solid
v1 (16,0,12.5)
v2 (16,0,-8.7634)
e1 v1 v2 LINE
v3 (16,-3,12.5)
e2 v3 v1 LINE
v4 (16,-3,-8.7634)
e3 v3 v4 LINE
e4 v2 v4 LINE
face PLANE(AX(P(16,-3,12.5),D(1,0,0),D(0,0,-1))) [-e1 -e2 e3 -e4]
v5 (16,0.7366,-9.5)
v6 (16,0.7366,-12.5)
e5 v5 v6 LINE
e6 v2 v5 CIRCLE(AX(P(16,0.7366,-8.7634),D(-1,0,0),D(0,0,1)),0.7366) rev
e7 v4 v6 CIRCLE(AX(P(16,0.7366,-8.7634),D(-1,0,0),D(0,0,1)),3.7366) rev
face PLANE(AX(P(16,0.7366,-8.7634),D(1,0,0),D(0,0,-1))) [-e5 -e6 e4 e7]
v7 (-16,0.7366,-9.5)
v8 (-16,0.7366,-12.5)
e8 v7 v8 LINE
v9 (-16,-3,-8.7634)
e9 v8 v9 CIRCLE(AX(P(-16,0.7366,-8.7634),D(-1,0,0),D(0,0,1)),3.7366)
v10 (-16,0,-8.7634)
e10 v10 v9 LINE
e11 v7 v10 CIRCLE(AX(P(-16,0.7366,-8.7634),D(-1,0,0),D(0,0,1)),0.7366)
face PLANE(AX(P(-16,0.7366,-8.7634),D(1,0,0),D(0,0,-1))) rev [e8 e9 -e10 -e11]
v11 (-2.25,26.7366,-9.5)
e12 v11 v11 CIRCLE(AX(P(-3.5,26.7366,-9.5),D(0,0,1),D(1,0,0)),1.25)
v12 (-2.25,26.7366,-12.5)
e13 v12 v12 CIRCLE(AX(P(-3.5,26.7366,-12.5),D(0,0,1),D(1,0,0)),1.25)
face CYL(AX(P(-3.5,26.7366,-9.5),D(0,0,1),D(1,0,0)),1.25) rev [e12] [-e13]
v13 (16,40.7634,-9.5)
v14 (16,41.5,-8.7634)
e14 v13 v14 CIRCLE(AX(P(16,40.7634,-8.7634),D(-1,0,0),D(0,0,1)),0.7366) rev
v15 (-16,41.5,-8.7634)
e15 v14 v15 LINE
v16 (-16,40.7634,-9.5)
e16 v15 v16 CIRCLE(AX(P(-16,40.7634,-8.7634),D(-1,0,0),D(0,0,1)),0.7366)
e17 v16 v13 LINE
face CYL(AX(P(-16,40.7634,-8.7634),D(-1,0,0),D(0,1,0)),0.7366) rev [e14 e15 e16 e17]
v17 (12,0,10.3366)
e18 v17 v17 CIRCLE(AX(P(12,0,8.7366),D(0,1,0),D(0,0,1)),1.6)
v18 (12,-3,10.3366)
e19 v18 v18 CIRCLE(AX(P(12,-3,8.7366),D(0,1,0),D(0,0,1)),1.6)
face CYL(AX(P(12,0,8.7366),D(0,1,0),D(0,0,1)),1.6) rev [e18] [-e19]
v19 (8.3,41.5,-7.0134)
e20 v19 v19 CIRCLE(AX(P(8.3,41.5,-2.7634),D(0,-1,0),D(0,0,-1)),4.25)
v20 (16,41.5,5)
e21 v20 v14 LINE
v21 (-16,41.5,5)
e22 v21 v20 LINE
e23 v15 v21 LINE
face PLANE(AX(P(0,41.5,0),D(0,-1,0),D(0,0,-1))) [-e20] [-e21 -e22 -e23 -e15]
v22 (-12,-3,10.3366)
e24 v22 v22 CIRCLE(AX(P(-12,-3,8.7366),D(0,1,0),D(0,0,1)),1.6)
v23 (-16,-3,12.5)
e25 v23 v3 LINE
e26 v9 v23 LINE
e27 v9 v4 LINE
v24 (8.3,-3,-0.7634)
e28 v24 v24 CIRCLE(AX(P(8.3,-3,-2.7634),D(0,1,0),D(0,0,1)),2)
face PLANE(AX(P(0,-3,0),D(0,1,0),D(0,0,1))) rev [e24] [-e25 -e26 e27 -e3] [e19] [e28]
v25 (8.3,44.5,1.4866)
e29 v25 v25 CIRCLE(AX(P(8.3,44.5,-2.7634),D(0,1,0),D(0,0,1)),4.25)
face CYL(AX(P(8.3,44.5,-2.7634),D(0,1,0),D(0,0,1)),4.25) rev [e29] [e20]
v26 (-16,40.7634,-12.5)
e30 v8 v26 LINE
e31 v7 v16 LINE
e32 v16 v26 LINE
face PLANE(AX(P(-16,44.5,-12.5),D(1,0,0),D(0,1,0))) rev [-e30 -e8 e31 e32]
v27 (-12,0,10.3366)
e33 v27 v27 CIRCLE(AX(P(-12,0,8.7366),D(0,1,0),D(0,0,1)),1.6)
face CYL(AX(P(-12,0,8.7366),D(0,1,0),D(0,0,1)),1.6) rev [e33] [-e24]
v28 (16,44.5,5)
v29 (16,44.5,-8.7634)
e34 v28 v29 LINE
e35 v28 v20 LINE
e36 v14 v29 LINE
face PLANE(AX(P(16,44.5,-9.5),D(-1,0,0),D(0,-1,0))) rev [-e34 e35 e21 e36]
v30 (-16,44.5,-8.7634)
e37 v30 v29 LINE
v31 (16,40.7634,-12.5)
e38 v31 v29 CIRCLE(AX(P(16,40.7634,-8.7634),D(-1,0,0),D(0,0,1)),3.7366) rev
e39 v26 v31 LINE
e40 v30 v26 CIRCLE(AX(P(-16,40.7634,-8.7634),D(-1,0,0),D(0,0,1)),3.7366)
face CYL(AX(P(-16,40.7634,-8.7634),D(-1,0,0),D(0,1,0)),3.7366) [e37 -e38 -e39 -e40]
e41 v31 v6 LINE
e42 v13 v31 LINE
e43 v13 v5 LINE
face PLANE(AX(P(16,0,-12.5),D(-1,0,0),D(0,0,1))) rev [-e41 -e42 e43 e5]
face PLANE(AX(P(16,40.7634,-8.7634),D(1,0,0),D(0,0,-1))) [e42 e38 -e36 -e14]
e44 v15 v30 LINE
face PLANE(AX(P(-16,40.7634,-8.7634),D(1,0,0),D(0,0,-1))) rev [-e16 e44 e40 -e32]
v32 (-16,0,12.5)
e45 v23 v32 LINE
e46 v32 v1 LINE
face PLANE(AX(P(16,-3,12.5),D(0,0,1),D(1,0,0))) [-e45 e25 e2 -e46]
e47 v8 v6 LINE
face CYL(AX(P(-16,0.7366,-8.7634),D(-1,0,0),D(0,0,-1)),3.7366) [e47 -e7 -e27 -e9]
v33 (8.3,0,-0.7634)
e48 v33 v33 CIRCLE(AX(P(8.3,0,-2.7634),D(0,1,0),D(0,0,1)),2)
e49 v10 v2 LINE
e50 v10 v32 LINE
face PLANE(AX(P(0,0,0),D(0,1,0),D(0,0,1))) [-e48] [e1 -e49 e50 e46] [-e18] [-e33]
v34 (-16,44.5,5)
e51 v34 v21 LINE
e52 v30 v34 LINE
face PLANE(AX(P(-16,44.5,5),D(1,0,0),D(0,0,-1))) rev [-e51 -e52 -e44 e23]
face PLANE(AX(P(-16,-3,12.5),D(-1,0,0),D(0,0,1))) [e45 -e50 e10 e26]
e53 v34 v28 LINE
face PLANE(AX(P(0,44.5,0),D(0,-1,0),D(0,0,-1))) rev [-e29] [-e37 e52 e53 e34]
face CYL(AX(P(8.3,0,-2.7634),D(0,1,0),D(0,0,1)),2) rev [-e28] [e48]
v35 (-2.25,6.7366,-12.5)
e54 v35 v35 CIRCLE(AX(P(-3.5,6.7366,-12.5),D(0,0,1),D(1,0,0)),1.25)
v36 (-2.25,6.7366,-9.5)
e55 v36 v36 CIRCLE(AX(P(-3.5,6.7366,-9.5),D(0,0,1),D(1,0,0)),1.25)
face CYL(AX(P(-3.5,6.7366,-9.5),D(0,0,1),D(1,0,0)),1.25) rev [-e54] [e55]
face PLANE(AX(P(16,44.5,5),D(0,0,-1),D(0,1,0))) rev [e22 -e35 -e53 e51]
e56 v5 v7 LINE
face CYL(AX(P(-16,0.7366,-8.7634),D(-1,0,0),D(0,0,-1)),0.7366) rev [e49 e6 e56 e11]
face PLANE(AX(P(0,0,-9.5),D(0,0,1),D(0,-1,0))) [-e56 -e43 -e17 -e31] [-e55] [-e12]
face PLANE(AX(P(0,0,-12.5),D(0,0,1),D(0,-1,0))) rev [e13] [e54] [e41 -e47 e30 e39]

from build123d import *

# Parameters (mm, degrees)
SKETCH1_W                        = 32
SKETCH1_H                        = 25
BASE_FLANGE1_DEPTH               = 3
EDGE_FLANGE1_STRIP_W             = 13.4732
EDGE_FLANGE1_STRIP_H             = 3
EDGE_FLANGE1_STRIP_CUT_DEPTH     = 32
EDGE_FLANGE1_DEPTH               = 32
EDGE_FLANGE2_STRIP_W             = 13.4732
EDGE_FLANGE2_STRIP_H             = 3
EDGE_FLANGE2_STRIP_CUT_DEPTH     = 32
EDGE_FLANGE2_DEPTH               = 32
TAP_DRILL_FOR_M3X0_5_TAP1_D      = 2.5
TAP_DRILL_FOR_M10X1_5_TAP2_D     = 8.5
TAP_DRILL_FOR_M10X1_5_TAP2_DEPTH = 3
M3_CLEARANCE_HOLE1_D             = 3.2
F_4_0_4_DIAMETER_HOLE1_D         = 4


# Sheet-metal steps are written as plain solids
with BuildPart() as part:
    # Sketch1 → Base-Flange1 (new body)
    with BuildSketch(Plane(origin=(0, 0, 0), x_dir=(1, 0, 0), z_dir=(0, 1, 0))):
        Rectangle(SKETCH1_W, SKETCH1_H)
    extrude(amount=-BASE_FLANGE1_DEPTH)

    # Edge-Flange1 strip (across the edge) → Edge-Flange1 strip cut (cut)
    with BuildSketch(Plane(origin=(16, 0, -12.5), x_dir=(0, 0, 1), z_dir=(-1, 0, 0))):
        with Locations((-3, -1.5)):
            Rectangle(EDGE_FLANGE1_STRIP_W, EDGE_FLANGE1_STRIP_H)
    extrude(amount=EDGE_FLANGE1_STRIP_CUT_DEPTH, mode=Mode.SUBTRACT)

    # Edge-Flange1 section (across the edge) → Edge-Flange1 (add)
    with BuildSketch(Plane(origin=(16, 0, -12.5), x_dir=(0, 0, 1), z_dir=(-1, 0, 0))):
        with BuildLine():
            Line((0, 0.7366), (0, 44.5))
            Line((0, 44.5), (3, 44.5))
            Line((3, 44.5), (3, 0.7366))
            ThreePointArc((3, 0.7366), (3.215745145, 0.215745145), (3.7366, 0))
            Line((3.7366, 0), (3.7366, -3))
            ThreePointArc((3.7366, -3), (1.094424801, -1.905575199), (0, 0.7366))
        make_face()
    extrude(amount=EDGE_FLANGE1_DEPTH)

    # Edge-Flange2 strip (across the edge) → Edge-Flange2 strip cut (cut)
    with BuildSketch(Plane(origin=(16, 44.5, -9.5), x_dir=(0, -1, 0), z_dir=(-1, 0, 0))):
        with Locations((-3, -1.5)):
            Rectangle(EDGE_FLANGE2_STRIP_W, EDGE_FLANGE2_STRIP_H)
    extrude(amount=EDGE_FLANGE2_STRIP_CUT_DEPTH, mode=Mode.SUBTRACT)

    # Edge-Flange2 section (across the edge) → Edge-Flange2 (add)
    with BuildSketch(Plane(origin=(16, 44.5, -9.5), x_dir=(0, -1, 0), z_dir=(-1, 0, 0))):
        with BuildLine():
            Line((0, 0.7366), (0, 14.5))
            Line((0, 14.5), (3, 14.5))
            Line((3, 14.5), (3, 0.7366))
            ThreePointArc((3, 0.7366), (3.215745145, 0.215745145), (3.7366, 0))
            Line((3.7366, 0), (3.7366, -3))
            ThreePointArc((3.7366, -3), (1.094424801, -1.905575199), (0, 0.7366))
        make_face()
    extrude(amount=EDGE_FLANGE2_DEPTH)

    # Tap Drill for M3x0.5 Tap1 (through all)
    with Locations(Plane.XY.offset(-9.5)):
        with Locations((-3.5, 6.7366), (-3.5, 26.7366)):
            Hole(TAP_DRILL_FOR_M3X0_5_TAP1_D / 2)

    # Tap Drill for M10x1.5 Tap2
    with Locations(Plane(origin=(0, 44.5, 0), x_dir=(1, 0, 0), z_dir=(0, 1, 0))):
        with Locations((8.3, 2.7634)):
            Hole(TAP_DRILL_FOR_M10X1_5_TAP2_D / 2, depth=TAP_DRILL_FOR_M10X1_5_TAP2_DEPTH)

    # M3 Clearance Hole1 (through all)
    with Locations(Plane(origin=(0, 0, 0), x_dir=(1, 0, 0), z_dir=(0, 1, 0))):
        with Locations((-12, -8.7366), (12, -8.7366)):
            Hole(M3_CLEARANCE_HOLE1_D / 2)

    # Ø4.0 (4) Diameter Hole1 (through all)
    with Locations(Plane(origin=(0, 0, 0), x_dir=(1, 0, 0), z_dir=(0, 1, 0))):
        with Locations((8.3, 2.7634)):
            Hole(F_4_0_4_DIAMETER_HOLE1_D / 2)


solid = part.part
